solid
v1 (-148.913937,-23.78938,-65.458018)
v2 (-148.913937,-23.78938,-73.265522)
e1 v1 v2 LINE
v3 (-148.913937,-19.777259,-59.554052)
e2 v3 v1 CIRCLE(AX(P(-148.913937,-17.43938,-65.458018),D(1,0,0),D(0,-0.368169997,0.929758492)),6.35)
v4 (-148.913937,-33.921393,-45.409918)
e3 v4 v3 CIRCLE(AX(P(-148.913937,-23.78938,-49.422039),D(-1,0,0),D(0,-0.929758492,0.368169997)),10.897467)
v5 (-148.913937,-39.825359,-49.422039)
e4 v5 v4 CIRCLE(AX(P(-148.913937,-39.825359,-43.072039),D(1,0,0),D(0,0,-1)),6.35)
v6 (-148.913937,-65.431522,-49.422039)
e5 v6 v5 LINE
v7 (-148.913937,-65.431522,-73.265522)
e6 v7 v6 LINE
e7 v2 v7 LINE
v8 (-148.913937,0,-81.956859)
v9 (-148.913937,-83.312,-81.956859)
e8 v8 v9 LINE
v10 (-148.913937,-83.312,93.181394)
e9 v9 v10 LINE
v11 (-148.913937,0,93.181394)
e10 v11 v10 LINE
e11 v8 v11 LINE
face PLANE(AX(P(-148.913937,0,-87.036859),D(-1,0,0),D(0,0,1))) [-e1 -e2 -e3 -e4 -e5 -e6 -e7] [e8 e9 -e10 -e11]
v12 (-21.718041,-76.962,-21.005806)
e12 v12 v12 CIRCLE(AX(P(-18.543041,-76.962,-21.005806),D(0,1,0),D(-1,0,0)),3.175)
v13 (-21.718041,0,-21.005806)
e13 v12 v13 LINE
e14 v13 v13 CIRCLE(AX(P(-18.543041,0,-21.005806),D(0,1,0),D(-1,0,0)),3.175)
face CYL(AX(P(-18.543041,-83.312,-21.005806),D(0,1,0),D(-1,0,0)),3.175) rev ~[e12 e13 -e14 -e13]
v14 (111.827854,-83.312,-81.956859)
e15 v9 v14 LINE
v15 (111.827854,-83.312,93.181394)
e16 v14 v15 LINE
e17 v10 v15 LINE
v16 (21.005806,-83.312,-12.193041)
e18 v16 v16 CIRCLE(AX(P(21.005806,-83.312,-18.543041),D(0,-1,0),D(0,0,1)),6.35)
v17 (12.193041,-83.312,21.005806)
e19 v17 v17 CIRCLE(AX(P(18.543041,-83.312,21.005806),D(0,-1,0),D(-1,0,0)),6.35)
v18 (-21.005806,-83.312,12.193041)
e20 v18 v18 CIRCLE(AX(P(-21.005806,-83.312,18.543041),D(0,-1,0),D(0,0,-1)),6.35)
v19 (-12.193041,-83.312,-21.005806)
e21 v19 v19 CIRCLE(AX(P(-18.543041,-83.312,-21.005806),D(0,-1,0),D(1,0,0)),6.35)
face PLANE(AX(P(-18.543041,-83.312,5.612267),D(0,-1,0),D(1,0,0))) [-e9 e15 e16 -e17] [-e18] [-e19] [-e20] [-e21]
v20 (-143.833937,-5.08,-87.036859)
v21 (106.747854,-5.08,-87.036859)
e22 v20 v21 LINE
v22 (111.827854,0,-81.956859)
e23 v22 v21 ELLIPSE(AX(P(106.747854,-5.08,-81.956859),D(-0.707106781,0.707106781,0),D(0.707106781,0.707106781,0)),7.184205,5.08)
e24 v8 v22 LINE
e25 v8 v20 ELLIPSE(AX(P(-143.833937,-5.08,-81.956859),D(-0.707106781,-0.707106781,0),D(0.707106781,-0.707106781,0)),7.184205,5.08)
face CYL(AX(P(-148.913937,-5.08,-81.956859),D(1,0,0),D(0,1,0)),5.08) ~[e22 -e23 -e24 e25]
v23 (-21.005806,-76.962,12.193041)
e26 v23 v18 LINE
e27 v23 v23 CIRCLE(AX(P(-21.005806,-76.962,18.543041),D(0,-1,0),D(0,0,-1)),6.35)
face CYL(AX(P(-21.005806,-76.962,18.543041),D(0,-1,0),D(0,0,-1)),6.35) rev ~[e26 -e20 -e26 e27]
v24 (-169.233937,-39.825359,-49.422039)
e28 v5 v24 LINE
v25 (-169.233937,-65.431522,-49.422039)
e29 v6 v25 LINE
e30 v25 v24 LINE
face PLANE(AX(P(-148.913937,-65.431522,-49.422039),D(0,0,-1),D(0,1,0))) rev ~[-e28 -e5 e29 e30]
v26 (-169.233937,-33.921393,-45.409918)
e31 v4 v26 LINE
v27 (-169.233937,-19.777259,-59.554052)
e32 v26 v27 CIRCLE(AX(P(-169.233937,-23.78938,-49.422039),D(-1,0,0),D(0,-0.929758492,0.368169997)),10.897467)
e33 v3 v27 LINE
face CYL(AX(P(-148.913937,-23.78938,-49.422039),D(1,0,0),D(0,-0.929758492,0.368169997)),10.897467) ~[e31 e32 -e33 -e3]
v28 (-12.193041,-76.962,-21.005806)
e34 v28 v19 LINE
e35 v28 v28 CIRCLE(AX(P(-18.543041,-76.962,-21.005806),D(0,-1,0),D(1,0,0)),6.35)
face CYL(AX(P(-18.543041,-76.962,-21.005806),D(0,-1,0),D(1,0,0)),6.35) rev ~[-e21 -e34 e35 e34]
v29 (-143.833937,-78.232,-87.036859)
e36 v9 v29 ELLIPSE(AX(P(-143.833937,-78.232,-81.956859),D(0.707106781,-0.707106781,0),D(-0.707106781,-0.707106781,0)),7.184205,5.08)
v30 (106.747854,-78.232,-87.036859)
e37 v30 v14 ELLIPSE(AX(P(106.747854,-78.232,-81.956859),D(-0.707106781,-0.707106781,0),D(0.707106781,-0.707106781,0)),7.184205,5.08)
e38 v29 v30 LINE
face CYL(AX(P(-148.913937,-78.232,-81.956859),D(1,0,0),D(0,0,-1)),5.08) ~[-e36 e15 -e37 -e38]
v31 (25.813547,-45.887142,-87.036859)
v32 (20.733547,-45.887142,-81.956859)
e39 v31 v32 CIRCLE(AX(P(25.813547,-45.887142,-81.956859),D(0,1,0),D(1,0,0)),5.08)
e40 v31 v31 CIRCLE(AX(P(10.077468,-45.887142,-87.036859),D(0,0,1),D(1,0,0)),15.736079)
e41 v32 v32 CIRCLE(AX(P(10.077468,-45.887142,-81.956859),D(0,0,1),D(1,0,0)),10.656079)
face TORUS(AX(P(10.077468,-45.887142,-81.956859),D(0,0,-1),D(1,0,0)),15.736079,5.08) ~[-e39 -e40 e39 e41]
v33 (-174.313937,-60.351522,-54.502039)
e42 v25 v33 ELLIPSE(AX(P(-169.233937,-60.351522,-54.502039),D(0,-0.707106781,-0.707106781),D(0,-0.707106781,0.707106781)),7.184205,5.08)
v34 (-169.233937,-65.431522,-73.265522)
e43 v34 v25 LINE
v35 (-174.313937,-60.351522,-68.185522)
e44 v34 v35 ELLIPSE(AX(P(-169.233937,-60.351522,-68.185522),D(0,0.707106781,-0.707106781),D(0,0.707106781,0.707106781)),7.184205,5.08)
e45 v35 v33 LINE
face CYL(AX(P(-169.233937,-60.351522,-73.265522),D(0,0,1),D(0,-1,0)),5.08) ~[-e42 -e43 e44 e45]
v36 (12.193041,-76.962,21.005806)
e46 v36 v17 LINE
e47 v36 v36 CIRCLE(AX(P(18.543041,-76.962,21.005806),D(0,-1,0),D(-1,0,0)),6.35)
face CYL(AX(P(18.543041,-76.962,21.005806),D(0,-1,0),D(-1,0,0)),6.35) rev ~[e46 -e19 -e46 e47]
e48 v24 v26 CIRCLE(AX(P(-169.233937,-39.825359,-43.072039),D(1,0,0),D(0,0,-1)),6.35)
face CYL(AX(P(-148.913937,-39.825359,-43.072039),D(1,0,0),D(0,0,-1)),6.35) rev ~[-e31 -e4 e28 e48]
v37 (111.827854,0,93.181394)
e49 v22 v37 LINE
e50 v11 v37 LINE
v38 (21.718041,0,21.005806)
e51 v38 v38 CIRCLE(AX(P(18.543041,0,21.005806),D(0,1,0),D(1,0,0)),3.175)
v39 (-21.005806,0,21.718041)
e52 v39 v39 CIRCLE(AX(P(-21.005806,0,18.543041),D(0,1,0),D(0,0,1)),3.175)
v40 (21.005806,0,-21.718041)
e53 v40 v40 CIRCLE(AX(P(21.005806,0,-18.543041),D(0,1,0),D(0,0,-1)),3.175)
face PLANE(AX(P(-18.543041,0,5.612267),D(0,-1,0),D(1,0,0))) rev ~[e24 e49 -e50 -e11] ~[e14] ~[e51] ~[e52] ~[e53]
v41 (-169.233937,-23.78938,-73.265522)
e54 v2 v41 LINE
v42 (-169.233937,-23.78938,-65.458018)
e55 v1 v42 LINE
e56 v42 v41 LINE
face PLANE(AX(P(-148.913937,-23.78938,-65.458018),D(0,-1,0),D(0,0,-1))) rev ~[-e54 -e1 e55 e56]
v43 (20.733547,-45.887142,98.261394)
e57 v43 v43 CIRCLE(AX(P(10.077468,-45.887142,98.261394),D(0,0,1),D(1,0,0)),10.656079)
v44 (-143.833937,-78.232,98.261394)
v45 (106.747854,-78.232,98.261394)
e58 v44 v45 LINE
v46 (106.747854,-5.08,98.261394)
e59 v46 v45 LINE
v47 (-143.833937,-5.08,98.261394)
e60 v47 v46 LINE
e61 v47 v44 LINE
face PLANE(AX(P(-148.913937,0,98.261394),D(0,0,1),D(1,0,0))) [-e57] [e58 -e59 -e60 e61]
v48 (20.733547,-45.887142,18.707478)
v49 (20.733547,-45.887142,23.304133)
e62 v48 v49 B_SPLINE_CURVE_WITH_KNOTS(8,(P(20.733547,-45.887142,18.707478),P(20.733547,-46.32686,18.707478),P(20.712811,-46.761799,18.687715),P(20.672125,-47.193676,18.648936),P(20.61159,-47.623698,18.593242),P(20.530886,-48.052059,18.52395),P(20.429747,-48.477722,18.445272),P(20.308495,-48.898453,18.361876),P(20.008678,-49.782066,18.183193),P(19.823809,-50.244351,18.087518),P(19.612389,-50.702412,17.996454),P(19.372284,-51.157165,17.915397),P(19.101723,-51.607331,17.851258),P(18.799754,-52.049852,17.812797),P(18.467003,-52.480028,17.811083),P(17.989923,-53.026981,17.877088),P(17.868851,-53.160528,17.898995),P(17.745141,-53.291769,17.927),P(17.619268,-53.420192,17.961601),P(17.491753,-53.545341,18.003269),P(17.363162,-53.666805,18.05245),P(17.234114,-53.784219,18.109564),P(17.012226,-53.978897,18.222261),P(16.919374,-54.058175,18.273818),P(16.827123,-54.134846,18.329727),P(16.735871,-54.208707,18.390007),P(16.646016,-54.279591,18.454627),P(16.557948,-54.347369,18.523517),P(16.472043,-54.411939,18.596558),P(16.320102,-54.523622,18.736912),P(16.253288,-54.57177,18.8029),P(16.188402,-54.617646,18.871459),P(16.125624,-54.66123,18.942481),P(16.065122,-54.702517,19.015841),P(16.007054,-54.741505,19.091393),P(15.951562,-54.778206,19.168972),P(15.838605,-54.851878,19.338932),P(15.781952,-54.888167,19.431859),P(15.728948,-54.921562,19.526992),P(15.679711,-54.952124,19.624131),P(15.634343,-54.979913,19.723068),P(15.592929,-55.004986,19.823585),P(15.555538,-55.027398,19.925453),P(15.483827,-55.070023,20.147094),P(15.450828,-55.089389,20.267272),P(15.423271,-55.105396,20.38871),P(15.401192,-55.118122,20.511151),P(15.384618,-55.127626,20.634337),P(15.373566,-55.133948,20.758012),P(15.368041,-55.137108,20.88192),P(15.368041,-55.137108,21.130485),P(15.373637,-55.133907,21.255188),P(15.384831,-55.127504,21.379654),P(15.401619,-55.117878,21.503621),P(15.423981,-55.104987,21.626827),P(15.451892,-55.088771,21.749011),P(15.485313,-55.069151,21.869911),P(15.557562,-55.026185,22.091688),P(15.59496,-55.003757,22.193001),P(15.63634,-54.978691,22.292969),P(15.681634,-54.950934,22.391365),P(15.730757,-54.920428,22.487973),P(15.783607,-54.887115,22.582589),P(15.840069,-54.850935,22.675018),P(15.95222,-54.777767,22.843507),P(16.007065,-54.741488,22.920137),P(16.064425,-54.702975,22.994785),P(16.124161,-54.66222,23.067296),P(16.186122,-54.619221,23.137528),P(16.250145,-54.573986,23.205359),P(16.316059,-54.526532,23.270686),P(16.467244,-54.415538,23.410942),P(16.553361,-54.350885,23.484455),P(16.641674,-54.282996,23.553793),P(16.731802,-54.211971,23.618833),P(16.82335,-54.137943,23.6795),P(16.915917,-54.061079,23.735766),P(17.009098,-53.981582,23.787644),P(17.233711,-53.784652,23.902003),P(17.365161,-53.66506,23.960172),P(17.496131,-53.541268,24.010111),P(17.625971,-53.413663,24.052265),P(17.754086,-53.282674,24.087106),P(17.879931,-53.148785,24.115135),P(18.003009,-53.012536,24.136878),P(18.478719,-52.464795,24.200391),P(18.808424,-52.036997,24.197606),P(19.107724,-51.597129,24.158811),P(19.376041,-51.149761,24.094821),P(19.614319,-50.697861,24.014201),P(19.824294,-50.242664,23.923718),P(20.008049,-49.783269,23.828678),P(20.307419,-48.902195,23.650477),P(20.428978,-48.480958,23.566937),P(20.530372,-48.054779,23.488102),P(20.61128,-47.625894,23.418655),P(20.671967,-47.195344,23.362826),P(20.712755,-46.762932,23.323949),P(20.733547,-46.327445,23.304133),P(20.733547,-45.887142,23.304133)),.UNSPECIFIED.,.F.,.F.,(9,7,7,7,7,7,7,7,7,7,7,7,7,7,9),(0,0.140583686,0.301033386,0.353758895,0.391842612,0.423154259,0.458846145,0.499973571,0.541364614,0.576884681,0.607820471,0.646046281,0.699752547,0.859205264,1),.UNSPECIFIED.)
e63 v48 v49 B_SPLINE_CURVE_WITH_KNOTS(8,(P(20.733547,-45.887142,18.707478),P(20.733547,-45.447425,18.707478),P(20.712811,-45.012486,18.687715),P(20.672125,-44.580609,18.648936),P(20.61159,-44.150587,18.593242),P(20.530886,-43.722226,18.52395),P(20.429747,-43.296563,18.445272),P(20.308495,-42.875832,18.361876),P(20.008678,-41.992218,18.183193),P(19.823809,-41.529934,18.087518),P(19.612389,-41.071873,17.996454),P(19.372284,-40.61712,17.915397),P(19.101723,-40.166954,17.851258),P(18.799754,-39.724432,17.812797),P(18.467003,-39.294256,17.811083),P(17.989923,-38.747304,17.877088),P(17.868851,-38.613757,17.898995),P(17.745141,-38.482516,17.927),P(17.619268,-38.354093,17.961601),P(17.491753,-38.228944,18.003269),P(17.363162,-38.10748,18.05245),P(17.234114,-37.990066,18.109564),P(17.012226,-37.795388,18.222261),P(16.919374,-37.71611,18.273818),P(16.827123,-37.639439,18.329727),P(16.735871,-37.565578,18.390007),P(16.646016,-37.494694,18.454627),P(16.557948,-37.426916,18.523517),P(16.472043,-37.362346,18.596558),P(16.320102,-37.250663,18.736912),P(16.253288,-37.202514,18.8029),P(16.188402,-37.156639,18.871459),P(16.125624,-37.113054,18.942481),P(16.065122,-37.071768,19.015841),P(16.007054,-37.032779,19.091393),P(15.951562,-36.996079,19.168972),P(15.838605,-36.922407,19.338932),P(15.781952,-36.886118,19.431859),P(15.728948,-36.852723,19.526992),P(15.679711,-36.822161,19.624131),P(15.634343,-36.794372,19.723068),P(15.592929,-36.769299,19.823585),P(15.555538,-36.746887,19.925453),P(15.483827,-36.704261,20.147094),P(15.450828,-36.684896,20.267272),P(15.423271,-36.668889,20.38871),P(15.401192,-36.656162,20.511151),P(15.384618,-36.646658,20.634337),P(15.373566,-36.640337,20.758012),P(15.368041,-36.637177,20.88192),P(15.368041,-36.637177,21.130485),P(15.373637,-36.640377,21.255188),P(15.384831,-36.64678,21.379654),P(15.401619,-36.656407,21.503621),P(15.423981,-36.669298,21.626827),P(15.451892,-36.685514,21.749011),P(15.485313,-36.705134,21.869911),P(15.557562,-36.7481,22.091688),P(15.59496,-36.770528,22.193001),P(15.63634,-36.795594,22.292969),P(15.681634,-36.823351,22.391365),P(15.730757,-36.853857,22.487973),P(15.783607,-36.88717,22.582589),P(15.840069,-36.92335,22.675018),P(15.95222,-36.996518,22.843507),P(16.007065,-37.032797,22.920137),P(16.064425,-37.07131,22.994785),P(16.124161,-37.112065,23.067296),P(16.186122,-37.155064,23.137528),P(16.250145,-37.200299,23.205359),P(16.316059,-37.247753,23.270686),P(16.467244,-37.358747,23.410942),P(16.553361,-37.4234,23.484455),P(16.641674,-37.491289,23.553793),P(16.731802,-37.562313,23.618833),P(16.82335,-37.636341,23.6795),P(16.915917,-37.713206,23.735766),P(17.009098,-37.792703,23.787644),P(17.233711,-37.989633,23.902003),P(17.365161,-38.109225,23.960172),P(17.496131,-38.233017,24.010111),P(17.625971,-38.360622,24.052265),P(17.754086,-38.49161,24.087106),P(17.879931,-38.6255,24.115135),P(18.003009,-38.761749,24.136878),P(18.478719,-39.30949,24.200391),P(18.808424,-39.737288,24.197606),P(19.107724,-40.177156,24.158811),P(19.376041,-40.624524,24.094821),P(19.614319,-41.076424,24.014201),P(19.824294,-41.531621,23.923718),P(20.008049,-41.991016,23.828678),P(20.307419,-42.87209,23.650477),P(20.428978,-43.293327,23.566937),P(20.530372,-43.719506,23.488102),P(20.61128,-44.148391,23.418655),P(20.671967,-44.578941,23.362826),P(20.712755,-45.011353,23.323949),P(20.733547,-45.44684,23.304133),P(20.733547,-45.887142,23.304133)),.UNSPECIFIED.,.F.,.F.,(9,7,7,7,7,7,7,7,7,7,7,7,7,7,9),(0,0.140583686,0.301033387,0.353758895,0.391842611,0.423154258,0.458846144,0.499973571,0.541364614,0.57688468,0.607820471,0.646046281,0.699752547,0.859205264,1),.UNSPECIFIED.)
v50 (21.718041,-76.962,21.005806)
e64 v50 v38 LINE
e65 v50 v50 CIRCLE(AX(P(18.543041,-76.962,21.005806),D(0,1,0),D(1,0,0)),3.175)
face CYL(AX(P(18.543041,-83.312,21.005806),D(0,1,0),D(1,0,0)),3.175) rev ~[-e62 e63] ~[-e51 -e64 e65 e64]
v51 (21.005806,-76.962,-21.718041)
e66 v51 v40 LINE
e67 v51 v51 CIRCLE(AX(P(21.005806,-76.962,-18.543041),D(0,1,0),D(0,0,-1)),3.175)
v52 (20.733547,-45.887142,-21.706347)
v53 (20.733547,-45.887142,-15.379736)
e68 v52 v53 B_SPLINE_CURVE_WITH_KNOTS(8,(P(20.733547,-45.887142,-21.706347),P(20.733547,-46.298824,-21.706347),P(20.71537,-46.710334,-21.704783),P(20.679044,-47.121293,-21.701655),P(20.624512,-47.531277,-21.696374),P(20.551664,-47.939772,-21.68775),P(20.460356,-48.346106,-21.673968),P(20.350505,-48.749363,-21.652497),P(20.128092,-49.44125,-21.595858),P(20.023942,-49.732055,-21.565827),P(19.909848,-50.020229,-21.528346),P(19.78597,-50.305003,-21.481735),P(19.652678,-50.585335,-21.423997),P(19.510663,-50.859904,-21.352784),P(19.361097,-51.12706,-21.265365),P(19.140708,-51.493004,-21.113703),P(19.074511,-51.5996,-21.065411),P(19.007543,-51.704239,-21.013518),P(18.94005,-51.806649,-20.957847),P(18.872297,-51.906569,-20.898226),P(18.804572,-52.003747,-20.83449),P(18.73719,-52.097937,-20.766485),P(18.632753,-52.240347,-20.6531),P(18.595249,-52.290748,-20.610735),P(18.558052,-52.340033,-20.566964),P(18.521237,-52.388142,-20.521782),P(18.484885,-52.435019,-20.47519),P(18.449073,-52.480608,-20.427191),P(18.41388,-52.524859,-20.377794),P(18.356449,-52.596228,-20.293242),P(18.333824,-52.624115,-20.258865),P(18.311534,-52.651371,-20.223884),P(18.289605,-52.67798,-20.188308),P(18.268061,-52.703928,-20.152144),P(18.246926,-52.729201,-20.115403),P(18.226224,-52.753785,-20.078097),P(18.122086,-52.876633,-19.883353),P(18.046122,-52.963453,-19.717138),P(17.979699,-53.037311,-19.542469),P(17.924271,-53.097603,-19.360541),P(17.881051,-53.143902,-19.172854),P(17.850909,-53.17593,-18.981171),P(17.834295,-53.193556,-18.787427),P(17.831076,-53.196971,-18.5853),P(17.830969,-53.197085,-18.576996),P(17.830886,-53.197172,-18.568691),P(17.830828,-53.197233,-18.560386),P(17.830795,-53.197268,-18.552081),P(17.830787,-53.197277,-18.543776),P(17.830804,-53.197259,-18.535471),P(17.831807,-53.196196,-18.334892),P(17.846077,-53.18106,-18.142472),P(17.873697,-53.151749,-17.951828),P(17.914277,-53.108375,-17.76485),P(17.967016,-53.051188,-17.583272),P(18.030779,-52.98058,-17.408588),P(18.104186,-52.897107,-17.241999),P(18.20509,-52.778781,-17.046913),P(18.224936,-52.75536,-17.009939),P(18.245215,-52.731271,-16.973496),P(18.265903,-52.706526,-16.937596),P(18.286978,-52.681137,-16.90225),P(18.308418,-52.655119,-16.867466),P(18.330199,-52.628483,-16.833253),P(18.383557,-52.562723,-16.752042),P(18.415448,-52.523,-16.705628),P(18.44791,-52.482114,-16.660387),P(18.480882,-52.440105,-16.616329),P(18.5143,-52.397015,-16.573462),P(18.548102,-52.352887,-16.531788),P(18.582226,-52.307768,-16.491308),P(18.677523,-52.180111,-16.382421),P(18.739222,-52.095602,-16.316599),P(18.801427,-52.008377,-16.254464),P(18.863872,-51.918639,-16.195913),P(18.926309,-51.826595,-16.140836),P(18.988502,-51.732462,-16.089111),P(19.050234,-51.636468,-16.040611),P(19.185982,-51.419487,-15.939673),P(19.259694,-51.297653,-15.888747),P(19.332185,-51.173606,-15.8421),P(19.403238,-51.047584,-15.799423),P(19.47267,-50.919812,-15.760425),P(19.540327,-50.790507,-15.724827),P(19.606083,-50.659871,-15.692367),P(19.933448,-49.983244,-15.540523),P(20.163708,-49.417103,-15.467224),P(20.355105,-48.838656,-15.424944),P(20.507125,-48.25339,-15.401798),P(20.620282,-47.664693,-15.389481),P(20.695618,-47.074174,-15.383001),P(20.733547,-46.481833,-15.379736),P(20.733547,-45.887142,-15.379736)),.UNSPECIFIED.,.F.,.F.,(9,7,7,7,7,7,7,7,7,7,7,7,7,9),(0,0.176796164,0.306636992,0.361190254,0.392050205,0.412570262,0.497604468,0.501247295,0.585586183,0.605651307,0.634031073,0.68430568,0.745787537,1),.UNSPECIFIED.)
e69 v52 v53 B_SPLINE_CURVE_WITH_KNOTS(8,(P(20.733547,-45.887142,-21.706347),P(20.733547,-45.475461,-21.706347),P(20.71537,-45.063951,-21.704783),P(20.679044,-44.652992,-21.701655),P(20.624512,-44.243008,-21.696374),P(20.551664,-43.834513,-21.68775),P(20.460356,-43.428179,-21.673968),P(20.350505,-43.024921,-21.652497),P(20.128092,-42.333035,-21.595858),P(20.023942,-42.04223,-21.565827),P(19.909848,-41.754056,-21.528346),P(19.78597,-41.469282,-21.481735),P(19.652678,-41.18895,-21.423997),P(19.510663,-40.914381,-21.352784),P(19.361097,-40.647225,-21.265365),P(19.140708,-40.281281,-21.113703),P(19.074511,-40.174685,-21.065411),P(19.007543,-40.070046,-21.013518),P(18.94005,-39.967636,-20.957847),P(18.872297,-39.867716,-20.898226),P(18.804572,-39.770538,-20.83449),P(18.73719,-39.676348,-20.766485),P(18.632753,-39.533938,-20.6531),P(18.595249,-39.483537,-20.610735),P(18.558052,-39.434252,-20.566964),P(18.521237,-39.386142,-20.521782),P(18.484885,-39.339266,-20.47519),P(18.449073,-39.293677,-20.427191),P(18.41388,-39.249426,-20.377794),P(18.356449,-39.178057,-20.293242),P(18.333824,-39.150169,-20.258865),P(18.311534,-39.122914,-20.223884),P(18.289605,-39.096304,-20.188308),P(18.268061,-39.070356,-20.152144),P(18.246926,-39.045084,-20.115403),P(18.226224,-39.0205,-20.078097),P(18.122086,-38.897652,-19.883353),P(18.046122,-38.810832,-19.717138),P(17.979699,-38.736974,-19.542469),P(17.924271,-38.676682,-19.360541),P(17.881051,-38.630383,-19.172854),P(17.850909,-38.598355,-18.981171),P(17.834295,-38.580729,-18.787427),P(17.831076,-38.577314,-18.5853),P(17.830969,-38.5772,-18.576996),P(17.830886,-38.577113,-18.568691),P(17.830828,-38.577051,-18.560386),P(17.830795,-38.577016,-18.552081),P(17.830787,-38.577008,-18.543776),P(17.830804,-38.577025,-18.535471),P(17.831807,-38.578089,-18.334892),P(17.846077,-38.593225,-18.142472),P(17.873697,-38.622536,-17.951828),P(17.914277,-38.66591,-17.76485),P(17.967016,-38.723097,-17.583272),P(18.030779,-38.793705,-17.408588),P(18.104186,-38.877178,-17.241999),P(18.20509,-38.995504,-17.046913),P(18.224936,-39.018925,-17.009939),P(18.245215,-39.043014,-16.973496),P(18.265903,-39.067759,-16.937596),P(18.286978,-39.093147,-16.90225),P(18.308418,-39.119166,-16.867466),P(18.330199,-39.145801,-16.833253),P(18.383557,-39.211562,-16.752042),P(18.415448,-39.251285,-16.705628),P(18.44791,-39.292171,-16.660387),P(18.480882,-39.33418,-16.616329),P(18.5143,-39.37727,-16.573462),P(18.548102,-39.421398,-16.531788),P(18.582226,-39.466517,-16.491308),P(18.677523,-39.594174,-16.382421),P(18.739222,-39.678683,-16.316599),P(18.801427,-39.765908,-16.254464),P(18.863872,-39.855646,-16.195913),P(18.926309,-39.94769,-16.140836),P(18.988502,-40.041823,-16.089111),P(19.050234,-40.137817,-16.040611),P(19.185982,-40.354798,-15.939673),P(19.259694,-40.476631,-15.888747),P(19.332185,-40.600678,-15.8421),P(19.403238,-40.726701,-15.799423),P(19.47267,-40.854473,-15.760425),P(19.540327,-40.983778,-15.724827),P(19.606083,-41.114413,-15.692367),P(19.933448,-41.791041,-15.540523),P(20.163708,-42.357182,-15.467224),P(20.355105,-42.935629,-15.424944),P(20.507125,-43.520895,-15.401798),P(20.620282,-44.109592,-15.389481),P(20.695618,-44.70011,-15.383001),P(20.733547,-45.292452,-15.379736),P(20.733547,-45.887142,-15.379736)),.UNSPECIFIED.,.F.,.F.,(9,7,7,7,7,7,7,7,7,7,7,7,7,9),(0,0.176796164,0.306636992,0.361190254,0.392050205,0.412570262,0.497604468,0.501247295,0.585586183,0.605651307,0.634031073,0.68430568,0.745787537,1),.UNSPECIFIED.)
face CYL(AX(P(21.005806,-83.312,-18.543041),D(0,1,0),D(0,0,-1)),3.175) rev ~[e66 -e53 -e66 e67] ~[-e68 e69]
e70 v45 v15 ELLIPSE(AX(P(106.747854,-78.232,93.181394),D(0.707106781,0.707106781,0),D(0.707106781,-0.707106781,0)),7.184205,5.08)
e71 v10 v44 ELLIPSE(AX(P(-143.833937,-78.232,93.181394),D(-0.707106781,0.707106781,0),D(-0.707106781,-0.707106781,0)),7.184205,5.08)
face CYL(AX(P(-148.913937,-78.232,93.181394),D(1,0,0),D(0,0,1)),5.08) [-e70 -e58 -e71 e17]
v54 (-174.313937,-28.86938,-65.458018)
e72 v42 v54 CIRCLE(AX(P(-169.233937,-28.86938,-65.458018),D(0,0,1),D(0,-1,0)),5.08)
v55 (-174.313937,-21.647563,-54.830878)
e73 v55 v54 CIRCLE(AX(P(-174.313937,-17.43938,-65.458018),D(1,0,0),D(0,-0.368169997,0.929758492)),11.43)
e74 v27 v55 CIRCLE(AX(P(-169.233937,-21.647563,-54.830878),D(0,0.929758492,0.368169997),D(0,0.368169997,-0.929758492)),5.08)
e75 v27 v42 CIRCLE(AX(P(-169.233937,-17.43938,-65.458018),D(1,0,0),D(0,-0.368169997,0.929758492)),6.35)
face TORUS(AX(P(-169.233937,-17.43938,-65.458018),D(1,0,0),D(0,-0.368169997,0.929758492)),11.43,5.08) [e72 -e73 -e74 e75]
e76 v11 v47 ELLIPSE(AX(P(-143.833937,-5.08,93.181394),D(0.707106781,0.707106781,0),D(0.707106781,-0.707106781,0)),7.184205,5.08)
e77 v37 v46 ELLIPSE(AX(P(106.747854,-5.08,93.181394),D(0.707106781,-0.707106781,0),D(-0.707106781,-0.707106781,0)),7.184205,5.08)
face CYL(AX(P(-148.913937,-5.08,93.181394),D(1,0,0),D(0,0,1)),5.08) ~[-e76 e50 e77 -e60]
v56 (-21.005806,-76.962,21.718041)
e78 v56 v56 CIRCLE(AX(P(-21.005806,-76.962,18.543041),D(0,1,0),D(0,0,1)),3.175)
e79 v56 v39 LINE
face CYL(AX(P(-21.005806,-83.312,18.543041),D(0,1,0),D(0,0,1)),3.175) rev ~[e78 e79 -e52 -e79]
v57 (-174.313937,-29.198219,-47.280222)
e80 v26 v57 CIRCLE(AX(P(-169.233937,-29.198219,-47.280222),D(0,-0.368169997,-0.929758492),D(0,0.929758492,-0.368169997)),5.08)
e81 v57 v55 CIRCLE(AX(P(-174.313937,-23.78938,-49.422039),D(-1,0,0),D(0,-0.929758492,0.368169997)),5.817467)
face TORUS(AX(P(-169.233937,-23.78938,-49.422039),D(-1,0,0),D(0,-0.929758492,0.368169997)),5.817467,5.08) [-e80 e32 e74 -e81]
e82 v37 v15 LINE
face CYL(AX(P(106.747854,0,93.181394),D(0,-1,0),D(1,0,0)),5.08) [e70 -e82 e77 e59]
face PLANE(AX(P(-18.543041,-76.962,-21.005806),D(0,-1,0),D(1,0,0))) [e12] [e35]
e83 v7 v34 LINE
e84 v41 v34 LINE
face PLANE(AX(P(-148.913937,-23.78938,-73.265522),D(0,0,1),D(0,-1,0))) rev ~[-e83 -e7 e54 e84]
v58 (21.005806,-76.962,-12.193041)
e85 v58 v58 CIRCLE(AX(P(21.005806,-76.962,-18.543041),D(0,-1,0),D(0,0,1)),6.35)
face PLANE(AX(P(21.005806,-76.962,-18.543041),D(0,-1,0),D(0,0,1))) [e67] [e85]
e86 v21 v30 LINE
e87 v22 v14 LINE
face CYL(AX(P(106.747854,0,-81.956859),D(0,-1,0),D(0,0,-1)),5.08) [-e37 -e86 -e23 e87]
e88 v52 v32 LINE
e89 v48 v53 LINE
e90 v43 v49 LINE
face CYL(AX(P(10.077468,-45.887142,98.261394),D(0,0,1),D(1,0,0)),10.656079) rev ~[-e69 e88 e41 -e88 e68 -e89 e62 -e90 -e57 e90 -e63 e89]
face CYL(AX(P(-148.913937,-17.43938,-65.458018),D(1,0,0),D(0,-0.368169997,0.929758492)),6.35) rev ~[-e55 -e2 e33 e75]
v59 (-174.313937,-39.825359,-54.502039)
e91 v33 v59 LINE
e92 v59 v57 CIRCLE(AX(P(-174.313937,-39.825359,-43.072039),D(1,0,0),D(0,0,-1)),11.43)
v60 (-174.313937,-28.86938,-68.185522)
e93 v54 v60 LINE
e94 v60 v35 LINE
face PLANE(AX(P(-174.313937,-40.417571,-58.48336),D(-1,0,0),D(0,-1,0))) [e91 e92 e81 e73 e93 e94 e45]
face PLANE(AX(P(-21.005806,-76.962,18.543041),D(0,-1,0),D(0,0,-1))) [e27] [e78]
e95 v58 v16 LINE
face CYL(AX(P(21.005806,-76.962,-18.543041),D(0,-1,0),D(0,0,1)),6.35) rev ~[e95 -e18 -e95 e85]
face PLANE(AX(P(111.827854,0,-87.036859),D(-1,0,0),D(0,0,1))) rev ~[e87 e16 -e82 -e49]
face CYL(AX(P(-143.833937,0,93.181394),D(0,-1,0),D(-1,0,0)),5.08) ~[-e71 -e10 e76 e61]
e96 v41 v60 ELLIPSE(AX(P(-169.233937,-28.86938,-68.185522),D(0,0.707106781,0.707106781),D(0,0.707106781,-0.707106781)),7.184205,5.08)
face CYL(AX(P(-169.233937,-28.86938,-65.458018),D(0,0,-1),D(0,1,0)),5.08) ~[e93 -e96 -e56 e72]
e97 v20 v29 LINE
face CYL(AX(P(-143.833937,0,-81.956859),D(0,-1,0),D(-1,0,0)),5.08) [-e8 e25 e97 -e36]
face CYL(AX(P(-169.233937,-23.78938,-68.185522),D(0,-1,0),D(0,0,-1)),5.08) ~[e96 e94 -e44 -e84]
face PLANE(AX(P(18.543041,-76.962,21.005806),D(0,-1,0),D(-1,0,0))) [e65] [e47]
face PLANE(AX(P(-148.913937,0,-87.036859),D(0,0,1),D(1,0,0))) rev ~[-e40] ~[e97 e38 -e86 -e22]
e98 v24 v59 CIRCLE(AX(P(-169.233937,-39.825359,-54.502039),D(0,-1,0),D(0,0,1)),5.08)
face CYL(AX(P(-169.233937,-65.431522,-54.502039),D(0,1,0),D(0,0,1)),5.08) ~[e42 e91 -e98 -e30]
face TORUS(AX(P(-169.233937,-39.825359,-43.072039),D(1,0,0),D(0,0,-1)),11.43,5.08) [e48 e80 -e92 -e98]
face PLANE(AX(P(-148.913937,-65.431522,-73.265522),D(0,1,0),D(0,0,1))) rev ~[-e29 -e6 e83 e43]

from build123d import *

# Parameters (mm, degrees)
F0_W            = 260.7417907566
F0_H            = 185.2982528508
F1_DEPTH        = 83.312
F2_R            = 5.08
F3_R            = 10.6560791483
F4_DEPTH        = 185.2982528508
F6_DEPTH        = 25.4
F7_R            = 5.08
F9_D            = 6.35
F9_CBORE_D      = 12.7
F9_CBORE_DEPTH  = 6.35
F9_COPIES_COUNT = 4


# Not quite as in the source:
# - a pattern or mirror of a feature is missing from the dataset's text; its kind, count and spacing are read off the source's solid


with BuildPart() as f1:
    # F0 (on Front) → F1 (new body)
    with BuildSketch(Plane.XZ):
        with Locations((-18.5430413112, 5.6122671813)):
            Rectangle(F0_W, F0_H)
    extrude(amount=F1_DEPTH)

    # F2
    f2_edges = [f1.edges().sort_by_distance(p)[0] for p in [
        (-148.913937, -41.656, 98.261394),
        (-18.543041, -83.312, 98.261394),
        (111.827854, -41.656, 98.261394),
        (-18.543041, 0, 98.261394),
    ]]
    fillet(f2_edges, radius=F2_R)

    # F3 (on face) → F4 (cut, through all)
    with BuildSketch(Plane.XY.offset(98.2613936067)):
        with Locations((10.0774681196, -45.8871424198)):
            Circle(F3_R)
    extrude(amount=-F4_DEPTH, mode=Mode.SUBTRACT)

    # F5 (on face) → F6 (join)
    with BuildSketch(Plane(origin=(-148.9139366895, 0, 0), x_dir=(0, -1, 0), z_dir=(-1, 0, 0))):
        with BuildLine():
            ThreePointArc((39.8253589774, -49.4220387191), (36.2562578791, -48.3240875907), (33.9213925534, -45.4099181994))
            ThreePointArc((33.9213925534, -45.4099181994), (16.0837066862, -41.7163656596), (19.777259226, -59.5540515267))
            ThreePointArc((19.777259226, -59.5540515267), (22.6914286173, -61.8889168524), (23.7893797457, -65.4580179507))
            Line((23.7893797457, -65.4580179507), (23.7893797457, -73.2655222528))
            Line((23.7893797457, -73.2655222528), (65.4315222055, -73.2655222528))
            Line((65.4315222055, -73.2655222528), (65.4315222055, -49.4220387191))
            Line((65.4315222055, -49.4220387191), (39.8253589774, -49.4220387191))
        make_face()
    extrude(amount=F6_DEPTH)

    # F7
    f7_edges = [f1.edges().sort_by_distance(p)[0] for p in [
        (-174.313937, -65.431522, -61.34378),
        (-174.313937, -52.628441, -49.422039),
        (-174.313937, -36.256258, -48.324088),
        (-174.313937, -16.083707, -41.716366),
        (-174.313937, -22.691429, -61.888917),
        (-174.313937, -23.78938, -69.36177),
        (-174.313937, -44.610451, -73.265522),
        (-148.913937, -41.656, -87.036859),
        (-18.543041, 0, -87.036859),
        (-18.543041, -83.312, -87.036859),
        (111.827854, -41.656, -87.036859),
        (-0.578611, -45.887142, -87.036859),
    ]]
    fillet(f7_edges, radius=F7_R)

    # F9 (through all)
    with Locations(Plane.XZ.offset(83.312)):
        with Locations((-18.5430413112, -21.0058055818)):
            f9 = CounterBoreHole(F9_D / 2, F9_CBORE_D / 2, F9_CBORE_DEPTH)

    # F9_copies: F9 ×4 about axis
    f9_copies_axis = Axis((0, 0, 0), (0, 1, 0))
    for i in range(1, F9_COPIES_COUNT):
        add(f9.rotate(f9_copies_axis, i * 360 / F9_COPIES_COUNT), mode=Mode.SUBTRACT)


solid = f1.part
